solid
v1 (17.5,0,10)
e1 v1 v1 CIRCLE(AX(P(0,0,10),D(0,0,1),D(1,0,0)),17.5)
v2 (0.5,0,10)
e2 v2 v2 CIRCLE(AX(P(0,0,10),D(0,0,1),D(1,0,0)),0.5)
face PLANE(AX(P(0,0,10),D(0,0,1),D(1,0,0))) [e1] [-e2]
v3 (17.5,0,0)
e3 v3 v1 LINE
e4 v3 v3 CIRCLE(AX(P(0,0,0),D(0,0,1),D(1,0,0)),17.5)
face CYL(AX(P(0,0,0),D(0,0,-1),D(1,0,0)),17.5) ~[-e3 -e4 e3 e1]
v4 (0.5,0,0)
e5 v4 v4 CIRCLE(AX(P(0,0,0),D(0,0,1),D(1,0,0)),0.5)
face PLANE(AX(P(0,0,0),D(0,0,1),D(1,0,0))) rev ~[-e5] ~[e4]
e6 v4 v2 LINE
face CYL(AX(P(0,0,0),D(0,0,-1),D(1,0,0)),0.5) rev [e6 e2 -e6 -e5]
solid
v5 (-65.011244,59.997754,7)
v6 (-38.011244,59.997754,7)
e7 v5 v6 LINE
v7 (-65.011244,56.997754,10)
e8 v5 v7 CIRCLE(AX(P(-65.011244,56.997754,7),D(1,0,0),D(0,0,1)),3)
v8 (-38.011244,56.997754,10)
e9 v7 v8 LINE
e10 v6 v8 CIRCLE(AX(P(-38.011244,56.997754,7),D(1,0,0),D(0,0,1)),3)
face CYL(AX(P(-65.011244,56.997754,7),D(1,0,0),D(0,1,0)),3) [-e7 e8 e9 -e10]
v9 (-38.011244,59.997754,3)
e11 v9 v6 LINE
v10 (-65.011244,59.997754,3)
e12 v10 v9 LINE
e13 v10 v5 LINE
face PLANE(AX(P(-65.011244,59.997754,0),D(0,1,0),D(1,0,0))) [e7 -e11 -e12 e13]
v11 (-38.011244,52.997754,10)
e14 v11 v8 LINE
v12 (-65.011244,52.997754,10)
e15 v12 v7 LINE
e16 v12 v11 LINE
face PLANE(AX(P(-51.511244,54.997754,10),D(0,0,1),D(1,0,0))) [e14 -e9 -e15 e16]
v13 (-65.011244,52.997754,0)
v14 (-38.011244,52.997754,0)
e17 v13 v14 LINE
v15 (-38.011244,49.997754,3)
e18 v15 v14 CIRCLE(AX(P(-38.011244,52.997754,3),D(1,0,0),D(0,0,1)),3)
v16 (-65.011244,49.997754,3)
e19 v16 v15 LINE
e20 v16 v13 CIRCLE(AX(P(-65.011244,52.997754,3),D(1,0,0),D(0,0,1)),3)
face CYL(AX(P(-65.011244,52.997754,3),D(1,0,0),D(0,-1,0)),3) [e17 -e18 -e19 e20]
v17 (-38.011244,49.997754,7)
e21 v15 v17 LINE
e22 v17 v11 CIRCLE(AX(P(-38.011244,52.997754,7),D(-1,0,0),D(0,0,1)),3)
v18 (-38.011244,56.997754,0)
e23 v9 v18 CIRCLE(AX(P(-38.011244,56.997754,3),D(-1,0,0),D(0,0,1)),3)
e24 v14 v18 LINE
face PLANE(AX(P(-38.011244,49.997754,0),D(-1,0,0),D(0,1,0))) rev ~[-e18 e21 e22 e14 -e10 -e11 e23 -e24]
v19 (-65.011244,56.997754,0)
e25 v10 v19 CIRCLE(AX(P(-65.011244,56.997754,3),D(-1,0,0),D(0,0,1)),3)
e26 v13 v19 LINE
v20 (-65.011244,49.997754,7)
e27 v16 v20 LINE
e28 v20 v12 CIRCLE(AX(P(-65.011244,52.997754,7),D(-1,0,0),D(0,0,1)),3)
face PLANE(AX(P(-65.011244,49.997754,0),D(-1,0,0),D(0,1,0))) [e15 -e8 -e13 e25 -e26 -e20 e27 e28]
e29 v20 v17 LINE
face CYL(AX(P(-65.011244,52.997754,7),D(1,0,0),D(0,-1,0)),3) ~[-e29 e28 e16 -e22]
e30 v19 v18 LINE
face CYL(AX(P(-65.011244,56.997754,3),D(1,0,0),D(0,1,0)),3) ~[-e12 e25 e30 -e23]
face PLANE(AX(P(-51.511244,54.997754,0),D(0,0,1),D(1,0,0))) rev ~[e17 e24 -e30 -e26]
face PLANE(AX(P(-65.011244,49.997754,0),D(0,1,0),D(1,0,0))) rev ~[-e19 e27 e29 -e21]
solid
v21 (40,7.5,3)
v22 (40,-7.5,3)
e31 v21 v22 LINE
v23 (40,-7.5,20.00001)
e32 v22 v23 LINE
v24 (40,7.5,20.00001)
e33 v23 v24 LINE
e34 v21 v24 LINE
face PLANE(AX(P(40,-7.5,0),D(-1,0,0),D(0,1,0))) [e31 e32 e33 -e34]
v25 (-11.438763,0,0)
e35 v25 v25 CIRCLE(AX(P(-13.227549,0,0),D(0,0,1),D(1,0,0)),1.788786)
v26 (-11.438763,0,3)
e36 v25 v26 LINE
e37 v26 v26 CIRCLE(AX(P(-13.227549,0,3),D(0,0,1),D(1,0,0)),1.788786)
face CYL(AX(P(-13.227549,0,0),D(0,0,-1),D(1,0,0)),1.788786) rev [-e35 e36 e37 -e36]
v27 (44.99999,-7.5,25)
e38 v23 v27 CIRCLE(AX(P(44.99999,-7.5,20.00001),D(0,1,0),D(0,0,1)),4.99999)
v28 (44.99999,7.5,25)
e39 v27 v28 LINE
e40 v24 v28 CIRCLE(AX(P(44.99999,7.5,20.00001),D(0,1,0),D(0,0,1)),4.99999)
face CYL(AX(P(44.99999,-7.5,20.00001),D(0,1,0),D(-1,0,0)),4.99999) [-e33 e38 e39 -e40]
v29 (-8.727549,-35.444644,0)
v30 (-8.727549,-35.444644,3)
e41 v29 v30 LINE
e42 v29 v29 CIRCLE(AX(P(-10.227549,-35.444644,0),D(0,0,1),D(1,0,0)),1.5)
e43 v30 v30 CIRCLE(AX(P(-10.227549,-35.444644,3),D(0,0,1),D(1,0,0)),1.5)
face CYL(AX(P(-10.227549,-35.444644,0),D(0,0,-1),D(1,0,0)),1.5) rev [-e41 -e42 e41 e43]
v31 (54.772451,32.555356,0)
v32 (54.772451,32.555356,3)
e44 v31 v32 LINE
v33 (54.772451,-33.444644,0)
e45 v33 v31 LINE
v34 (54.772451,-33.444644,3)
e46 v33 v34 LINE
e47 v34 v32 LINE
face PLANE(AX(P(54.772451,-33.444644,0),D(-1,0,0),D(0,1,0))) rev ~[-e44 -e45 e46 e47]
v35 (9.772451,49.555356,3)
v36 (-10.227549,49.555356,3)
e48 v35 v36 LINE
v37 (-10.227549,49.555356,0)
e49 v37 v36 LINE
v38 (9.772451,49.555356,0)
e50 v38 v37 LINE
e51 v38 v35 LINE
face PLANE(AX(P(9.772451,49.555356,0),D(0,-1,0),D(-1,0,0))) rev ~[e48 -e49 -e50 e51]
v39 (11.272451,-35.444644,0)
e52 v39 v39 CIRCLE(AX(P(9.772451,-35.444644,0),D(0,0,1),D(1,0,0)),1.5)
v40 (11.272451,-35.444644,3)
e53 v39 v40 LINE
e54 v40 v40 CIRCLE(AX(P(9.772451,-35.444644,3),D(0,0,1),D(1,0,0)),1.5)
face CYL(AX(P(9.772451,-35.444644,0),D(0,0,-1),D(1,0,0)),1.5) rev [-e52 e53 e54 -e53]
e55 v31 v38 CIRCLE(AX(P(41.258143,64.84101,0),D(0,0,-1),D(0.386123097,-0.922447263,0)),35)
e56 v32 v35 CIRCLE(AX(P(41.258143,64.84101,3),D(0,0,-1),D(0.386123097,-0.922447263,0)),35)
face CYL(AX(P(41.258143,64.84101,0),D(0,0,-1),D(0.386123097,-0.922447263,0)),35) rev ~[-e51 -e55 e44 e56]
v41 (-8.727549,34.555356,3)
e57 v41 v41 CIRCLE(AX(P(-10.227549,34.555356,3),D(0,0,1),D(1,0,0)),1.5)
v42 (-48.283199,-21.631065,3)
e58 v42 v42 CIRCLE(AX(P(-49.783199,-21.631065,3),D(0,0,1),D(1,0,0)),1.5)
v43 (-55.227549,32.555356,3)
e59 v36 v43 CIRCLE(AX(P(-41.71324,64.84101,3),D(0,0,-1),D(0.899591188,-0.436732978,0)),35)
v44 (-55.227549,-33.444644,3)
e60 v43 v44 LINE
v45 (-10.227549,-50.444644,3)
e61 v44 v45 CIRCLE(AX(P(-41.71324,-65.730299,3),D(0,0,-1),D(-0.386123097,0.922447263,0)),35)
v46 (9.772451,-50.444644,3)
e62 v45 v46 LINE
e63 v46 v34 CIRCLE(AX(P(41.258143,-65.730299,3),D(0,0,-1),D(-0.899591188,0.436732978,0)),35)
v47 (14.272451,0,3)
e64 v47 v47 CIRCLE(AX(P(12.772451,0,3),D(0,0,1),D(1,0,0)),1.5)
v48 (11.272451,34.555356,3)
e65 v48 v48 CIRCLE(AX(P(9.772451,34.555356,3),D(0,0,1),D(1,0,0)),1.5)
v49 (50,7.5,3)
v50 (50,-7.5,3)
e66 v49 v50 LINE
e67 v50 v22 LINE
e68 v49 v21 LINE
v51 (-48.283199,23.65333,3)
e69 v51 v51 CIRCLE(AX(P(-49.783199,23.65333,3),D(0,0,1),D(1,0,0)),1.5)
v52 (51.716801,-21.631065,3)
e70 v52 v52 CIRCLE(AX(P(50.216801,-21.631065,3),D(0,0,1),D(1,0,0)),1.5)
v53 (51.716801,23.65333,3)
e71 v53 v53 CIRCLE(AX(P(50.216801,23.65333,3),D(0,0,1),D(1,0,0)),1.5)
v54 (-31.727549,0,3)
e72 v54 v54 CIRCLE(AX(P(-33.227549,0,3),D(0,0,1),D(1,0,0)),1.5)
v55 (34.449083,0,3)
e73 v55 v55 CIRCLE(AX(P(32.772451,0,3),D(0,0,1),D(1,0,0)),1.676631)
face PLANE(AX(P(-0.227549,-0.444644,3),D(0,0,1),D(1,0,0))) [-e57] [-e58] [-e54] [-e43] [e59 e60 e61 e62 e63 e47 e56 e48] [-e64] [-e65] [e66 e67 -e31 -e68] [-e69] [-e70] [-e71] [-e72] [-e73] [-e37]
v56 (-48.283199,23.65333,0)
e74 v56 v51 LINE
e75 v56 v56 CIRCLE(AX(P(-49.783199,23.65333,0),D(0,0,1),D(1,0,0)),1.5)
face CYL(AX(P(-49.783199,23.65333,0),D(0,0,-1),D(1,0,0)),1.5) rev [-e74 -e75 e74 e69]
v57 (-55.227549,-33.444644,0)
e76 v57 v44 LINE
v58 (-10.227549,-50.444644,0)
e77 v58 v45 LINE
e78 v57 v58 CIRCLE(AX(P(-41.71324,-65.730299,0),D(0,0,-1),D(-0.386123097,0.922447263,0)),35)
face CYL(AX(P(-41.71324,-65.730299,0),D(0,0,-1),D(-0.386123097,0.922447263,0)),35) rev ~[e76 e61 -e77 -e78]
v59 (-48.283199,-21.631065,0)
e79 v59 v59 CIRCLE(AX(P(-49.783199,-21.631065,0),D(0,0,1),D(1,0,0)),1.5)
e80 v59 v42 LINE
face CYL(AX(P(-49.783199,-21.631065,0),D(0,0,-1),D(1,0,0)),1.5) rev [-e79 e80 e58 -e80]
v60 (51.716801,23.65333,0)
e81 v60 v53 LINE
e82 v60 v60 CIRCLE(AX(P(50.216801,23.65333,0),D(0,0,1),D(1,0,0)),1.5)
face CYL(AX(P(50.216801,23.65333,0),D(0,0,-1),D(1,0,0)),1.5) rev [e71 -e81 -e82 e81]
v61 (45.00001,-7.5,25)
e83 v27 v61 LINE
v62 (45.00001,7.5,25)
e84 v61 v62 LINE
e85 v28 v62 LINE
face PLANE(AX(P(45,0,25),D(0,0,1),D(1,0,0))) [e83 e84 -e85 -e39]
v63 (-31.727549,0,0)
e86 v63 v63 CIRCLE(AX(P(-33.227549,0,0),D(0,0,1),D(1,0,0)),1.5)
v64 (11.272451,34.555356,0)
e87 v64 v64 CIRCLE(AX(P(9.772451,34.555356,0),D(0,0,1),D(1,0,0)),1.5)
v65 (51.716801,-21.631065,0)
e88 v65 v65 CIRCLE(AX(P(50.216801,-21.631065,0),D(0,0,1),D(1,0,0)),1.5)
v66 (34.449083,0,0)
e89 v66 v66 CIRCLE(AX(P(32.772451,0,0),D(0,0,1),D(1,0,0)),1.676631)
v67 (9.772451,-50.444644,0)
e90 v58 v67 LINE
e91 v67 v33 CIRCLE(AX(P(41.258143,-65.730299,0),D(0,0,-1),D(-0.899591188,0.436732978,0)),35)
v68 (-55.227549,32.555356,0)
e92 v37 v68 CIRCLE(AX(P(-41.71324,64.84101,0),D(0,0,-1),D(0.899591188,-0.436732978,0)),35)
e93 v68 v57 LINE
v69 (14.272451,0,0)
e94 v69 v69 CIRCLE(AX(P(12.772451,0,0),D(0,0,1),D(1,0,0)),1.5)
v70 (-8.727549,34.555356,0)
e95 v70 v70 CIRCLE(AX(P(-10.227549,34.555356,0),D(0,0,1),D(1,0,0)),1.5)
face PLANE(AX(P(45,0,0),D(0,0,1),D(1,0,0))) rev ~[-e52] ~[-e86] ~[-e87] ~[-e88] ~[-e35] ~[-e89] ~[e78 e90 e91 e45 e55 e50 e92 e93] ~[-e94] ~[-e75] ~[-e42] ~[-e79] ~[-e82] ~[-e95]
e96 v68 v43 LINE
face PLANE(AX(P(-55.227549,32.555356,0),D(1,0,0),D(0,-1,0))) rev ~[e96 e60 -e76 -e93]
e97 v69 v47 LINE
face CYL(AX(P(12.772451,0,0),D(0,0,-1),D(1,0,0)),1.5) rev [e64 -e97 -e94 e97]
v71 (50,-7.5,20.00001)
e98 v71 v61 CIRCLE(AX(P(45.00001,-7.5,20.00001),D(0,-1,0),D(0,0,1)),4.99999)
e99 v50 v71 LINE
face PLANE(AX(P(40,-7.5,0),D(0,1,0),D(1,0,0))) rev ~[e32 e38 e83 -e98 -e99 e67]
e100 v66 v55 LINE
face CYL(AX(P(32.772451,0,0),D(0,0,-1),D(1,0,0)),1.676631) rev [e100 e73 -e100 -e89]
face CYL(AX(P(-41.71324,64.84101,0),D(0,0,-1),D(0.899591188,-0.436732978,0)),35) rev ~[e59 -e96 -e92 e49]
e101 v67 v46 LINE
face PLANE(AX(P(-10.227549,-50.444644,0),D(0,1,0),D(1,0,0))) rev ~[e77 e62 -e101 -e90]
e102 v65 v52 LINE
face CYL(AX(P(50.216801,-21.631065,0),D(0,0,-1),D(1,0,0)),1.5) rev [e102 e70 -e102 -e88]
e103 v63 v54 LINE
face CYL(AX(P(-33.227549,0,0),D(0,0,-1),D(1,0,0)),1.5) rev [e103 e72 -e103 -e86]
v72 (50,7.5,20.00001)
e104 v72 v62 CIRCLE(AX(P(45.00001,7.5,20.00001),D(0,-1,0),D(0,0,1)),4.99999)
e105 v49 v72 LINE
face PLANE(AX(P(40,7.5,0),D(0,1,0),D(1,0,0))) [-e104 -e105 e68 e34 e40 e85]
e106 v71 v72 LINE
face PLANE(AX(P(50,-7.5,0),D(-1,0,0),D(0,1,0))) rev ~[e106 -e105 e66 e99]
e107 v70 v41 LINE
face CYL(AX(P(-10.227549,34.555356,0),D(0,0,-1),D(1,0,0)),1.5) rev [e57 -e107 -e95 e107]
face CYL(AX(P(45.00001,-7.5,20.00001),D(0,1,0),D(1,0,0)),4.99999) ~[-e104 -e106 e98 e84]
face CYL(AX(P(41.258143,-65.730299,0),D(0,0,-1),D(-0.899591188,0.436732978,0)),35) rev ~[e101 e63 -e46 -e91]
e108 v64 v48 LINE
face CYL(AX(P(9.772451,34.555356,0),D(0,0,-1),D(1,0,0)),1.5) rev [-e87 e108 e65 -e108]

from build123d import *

# Parameters (mm, degrees)
F0_R     = 17.5
F0_R_2   = 0.5
F1_DEPTH = 10
F2_W     = 27
F2_H     = 10
F3_DEPTH = 10
F4_R     = 3
F5_R     = 1.5
F5_R_2   = 1.7887858733
F5_R_3   = 1.6766314054
F6_DEPTH = 3
F7_W     = 10
F7_H     = 15
F8_DEPTH = 25
F9_R     = 4.99999


# Not quite as in the source:
# - a fillet or chamfer is up to 0.001 mm smaller than in the source, because OpenCascade refuses the exact size


with BuildPart() as f1:
    # F0 (on Top) → F1 (new body)
    with BuildSketch(Plane.XY):
        Circle(F0_R)
        Circle(F0_R_2, mode=Mode.SUBTRACT)
    extrude(amount=F1_DEPTH)


with BuildPart() as f3:
    # F2 (on Top) → F3 (new body)
    with BuildSketch(Plane.XY):
        with Locations((-51.5112442672, 54.997754395)):
            Rectangle(F2_W, F2_H)
    extrude(amount=F3_DEPTH)

    # F4
    f4_edges = [f3.edges().sort_by_distance(p)[0] for p in [
        (-51.511244, 59.997754, 10),
        (-51.511244, 49.997754, 10),
        (-51.511244, 49.997754, 0),
        (-51.511244, 59.997754, 0),
    ]]
    fillet(f4_edges, radius=F4_R)


with BuildPart() as f6:
    # F5 (on Top) → F6 (new body)
    with BuildSketch(Plane.XY):
        with BuildLine():
            ThreePointArc((54.7724512979, 32.5553555772), (28.8891229863, 32.099486517), (9.7724512979, 49.5553555772))
            Line((9.7724512979, 49.5553555772), (-10.2275487021, 49.5553555772))
            ThreePointArc((-10.2275487021, 49.5553555772), (-29.3442203904, 32.099486517), (-55.2275487021, 32.5553555772))
            Line((-55.2275487021, 32.5553555772), (-55.2275487021, -33.4446444228))
            ThreePointArc((-55.2275487021, -33.4446444228), (-29.3442203904, -32.9887753626), (-10.2275487021, -50.4446444228))
            Line((-10.2275487021, -50.4446444228), (9.7724512979, -50.4446444228))
            ThreePointArc((9.7724512979, -50.4446444228), (28.8891229863, -32.9887753626), (54.7724512979, -33.4446444228))
            Line((54.7724512979, -33.4446444228), (54.7724512979, 32.5553555772))
        make_face()
        with Locations((-10.2275487021, -35.4446444228)):
            Circle(F5_R, mode=Mode.SUBTRACT)
        with Locations((-49.7831985605, -21.6310646678)):
            Circle(F5_R, mode=Mode.SUBTRACT)
        with Locations((9.7724512979, -35.4446444228)):
            Circle(F5_R, mode=Mode.SUBTRACT)
        with Locations((50.2168014395, -21.6310646678)):
            Circle(F5_R, mode=Mode.SUBTRACT)
        with Locations((-33.2275487021, 0)):
            Circle(F5_R, mode=Mode.SUBTRACT)
        with Locations((-49.7831985605, 23.6533302814)):
            Circle(F5_R, mode=Mode.SUBTRACT)
        with Locations((-13.2275487021, 0)):
            Circle(F5_R_2, mode=Mode.SUBTRACT)
        with Locations((-10.2275487021, 34.5553555772)):
            Circle(F5_R, mode=Mode.SUBTRACT)
        with Locations((12.7724512979, 0)):
            Circle(F5_R, mode=Mode.SUBTRACT)
        with Locations((32.7724512979, 0)):
            Circle(F5_R_3, mode=Mode.SUBTRACT)
        with Locations((50.2168014395, 23.6533302814)):
            Circle(F5_R, mode=Mode.SUBTRACT)
        with Locations((9.7724512979, 34.5553555772)):
            Circle(F5_R, mode=Mode.SUBTRACT)
    extrude(amount=F6_DEPTH)

    # F7 (on Top) → F8 (join)
    with BuildSketch(Plane.XY):
        with Locations((45, 0)):
            Rectangle(F7_W, F7_H)
    extrude(amount=F8_DEPTH)

    # F9 (radius 5 in the source; OpenCascade refuses exactly that, so slightly less here)
    f9_edges = [f6.edges().sort_by_distance(p)[0] for p in [
        (50, 0, 25),
        (40, 0, 25),
    ]]
    fillet(f9_edges, radius=F9_R)


solid = Compound([f1.part, f3.part, f6.part])
